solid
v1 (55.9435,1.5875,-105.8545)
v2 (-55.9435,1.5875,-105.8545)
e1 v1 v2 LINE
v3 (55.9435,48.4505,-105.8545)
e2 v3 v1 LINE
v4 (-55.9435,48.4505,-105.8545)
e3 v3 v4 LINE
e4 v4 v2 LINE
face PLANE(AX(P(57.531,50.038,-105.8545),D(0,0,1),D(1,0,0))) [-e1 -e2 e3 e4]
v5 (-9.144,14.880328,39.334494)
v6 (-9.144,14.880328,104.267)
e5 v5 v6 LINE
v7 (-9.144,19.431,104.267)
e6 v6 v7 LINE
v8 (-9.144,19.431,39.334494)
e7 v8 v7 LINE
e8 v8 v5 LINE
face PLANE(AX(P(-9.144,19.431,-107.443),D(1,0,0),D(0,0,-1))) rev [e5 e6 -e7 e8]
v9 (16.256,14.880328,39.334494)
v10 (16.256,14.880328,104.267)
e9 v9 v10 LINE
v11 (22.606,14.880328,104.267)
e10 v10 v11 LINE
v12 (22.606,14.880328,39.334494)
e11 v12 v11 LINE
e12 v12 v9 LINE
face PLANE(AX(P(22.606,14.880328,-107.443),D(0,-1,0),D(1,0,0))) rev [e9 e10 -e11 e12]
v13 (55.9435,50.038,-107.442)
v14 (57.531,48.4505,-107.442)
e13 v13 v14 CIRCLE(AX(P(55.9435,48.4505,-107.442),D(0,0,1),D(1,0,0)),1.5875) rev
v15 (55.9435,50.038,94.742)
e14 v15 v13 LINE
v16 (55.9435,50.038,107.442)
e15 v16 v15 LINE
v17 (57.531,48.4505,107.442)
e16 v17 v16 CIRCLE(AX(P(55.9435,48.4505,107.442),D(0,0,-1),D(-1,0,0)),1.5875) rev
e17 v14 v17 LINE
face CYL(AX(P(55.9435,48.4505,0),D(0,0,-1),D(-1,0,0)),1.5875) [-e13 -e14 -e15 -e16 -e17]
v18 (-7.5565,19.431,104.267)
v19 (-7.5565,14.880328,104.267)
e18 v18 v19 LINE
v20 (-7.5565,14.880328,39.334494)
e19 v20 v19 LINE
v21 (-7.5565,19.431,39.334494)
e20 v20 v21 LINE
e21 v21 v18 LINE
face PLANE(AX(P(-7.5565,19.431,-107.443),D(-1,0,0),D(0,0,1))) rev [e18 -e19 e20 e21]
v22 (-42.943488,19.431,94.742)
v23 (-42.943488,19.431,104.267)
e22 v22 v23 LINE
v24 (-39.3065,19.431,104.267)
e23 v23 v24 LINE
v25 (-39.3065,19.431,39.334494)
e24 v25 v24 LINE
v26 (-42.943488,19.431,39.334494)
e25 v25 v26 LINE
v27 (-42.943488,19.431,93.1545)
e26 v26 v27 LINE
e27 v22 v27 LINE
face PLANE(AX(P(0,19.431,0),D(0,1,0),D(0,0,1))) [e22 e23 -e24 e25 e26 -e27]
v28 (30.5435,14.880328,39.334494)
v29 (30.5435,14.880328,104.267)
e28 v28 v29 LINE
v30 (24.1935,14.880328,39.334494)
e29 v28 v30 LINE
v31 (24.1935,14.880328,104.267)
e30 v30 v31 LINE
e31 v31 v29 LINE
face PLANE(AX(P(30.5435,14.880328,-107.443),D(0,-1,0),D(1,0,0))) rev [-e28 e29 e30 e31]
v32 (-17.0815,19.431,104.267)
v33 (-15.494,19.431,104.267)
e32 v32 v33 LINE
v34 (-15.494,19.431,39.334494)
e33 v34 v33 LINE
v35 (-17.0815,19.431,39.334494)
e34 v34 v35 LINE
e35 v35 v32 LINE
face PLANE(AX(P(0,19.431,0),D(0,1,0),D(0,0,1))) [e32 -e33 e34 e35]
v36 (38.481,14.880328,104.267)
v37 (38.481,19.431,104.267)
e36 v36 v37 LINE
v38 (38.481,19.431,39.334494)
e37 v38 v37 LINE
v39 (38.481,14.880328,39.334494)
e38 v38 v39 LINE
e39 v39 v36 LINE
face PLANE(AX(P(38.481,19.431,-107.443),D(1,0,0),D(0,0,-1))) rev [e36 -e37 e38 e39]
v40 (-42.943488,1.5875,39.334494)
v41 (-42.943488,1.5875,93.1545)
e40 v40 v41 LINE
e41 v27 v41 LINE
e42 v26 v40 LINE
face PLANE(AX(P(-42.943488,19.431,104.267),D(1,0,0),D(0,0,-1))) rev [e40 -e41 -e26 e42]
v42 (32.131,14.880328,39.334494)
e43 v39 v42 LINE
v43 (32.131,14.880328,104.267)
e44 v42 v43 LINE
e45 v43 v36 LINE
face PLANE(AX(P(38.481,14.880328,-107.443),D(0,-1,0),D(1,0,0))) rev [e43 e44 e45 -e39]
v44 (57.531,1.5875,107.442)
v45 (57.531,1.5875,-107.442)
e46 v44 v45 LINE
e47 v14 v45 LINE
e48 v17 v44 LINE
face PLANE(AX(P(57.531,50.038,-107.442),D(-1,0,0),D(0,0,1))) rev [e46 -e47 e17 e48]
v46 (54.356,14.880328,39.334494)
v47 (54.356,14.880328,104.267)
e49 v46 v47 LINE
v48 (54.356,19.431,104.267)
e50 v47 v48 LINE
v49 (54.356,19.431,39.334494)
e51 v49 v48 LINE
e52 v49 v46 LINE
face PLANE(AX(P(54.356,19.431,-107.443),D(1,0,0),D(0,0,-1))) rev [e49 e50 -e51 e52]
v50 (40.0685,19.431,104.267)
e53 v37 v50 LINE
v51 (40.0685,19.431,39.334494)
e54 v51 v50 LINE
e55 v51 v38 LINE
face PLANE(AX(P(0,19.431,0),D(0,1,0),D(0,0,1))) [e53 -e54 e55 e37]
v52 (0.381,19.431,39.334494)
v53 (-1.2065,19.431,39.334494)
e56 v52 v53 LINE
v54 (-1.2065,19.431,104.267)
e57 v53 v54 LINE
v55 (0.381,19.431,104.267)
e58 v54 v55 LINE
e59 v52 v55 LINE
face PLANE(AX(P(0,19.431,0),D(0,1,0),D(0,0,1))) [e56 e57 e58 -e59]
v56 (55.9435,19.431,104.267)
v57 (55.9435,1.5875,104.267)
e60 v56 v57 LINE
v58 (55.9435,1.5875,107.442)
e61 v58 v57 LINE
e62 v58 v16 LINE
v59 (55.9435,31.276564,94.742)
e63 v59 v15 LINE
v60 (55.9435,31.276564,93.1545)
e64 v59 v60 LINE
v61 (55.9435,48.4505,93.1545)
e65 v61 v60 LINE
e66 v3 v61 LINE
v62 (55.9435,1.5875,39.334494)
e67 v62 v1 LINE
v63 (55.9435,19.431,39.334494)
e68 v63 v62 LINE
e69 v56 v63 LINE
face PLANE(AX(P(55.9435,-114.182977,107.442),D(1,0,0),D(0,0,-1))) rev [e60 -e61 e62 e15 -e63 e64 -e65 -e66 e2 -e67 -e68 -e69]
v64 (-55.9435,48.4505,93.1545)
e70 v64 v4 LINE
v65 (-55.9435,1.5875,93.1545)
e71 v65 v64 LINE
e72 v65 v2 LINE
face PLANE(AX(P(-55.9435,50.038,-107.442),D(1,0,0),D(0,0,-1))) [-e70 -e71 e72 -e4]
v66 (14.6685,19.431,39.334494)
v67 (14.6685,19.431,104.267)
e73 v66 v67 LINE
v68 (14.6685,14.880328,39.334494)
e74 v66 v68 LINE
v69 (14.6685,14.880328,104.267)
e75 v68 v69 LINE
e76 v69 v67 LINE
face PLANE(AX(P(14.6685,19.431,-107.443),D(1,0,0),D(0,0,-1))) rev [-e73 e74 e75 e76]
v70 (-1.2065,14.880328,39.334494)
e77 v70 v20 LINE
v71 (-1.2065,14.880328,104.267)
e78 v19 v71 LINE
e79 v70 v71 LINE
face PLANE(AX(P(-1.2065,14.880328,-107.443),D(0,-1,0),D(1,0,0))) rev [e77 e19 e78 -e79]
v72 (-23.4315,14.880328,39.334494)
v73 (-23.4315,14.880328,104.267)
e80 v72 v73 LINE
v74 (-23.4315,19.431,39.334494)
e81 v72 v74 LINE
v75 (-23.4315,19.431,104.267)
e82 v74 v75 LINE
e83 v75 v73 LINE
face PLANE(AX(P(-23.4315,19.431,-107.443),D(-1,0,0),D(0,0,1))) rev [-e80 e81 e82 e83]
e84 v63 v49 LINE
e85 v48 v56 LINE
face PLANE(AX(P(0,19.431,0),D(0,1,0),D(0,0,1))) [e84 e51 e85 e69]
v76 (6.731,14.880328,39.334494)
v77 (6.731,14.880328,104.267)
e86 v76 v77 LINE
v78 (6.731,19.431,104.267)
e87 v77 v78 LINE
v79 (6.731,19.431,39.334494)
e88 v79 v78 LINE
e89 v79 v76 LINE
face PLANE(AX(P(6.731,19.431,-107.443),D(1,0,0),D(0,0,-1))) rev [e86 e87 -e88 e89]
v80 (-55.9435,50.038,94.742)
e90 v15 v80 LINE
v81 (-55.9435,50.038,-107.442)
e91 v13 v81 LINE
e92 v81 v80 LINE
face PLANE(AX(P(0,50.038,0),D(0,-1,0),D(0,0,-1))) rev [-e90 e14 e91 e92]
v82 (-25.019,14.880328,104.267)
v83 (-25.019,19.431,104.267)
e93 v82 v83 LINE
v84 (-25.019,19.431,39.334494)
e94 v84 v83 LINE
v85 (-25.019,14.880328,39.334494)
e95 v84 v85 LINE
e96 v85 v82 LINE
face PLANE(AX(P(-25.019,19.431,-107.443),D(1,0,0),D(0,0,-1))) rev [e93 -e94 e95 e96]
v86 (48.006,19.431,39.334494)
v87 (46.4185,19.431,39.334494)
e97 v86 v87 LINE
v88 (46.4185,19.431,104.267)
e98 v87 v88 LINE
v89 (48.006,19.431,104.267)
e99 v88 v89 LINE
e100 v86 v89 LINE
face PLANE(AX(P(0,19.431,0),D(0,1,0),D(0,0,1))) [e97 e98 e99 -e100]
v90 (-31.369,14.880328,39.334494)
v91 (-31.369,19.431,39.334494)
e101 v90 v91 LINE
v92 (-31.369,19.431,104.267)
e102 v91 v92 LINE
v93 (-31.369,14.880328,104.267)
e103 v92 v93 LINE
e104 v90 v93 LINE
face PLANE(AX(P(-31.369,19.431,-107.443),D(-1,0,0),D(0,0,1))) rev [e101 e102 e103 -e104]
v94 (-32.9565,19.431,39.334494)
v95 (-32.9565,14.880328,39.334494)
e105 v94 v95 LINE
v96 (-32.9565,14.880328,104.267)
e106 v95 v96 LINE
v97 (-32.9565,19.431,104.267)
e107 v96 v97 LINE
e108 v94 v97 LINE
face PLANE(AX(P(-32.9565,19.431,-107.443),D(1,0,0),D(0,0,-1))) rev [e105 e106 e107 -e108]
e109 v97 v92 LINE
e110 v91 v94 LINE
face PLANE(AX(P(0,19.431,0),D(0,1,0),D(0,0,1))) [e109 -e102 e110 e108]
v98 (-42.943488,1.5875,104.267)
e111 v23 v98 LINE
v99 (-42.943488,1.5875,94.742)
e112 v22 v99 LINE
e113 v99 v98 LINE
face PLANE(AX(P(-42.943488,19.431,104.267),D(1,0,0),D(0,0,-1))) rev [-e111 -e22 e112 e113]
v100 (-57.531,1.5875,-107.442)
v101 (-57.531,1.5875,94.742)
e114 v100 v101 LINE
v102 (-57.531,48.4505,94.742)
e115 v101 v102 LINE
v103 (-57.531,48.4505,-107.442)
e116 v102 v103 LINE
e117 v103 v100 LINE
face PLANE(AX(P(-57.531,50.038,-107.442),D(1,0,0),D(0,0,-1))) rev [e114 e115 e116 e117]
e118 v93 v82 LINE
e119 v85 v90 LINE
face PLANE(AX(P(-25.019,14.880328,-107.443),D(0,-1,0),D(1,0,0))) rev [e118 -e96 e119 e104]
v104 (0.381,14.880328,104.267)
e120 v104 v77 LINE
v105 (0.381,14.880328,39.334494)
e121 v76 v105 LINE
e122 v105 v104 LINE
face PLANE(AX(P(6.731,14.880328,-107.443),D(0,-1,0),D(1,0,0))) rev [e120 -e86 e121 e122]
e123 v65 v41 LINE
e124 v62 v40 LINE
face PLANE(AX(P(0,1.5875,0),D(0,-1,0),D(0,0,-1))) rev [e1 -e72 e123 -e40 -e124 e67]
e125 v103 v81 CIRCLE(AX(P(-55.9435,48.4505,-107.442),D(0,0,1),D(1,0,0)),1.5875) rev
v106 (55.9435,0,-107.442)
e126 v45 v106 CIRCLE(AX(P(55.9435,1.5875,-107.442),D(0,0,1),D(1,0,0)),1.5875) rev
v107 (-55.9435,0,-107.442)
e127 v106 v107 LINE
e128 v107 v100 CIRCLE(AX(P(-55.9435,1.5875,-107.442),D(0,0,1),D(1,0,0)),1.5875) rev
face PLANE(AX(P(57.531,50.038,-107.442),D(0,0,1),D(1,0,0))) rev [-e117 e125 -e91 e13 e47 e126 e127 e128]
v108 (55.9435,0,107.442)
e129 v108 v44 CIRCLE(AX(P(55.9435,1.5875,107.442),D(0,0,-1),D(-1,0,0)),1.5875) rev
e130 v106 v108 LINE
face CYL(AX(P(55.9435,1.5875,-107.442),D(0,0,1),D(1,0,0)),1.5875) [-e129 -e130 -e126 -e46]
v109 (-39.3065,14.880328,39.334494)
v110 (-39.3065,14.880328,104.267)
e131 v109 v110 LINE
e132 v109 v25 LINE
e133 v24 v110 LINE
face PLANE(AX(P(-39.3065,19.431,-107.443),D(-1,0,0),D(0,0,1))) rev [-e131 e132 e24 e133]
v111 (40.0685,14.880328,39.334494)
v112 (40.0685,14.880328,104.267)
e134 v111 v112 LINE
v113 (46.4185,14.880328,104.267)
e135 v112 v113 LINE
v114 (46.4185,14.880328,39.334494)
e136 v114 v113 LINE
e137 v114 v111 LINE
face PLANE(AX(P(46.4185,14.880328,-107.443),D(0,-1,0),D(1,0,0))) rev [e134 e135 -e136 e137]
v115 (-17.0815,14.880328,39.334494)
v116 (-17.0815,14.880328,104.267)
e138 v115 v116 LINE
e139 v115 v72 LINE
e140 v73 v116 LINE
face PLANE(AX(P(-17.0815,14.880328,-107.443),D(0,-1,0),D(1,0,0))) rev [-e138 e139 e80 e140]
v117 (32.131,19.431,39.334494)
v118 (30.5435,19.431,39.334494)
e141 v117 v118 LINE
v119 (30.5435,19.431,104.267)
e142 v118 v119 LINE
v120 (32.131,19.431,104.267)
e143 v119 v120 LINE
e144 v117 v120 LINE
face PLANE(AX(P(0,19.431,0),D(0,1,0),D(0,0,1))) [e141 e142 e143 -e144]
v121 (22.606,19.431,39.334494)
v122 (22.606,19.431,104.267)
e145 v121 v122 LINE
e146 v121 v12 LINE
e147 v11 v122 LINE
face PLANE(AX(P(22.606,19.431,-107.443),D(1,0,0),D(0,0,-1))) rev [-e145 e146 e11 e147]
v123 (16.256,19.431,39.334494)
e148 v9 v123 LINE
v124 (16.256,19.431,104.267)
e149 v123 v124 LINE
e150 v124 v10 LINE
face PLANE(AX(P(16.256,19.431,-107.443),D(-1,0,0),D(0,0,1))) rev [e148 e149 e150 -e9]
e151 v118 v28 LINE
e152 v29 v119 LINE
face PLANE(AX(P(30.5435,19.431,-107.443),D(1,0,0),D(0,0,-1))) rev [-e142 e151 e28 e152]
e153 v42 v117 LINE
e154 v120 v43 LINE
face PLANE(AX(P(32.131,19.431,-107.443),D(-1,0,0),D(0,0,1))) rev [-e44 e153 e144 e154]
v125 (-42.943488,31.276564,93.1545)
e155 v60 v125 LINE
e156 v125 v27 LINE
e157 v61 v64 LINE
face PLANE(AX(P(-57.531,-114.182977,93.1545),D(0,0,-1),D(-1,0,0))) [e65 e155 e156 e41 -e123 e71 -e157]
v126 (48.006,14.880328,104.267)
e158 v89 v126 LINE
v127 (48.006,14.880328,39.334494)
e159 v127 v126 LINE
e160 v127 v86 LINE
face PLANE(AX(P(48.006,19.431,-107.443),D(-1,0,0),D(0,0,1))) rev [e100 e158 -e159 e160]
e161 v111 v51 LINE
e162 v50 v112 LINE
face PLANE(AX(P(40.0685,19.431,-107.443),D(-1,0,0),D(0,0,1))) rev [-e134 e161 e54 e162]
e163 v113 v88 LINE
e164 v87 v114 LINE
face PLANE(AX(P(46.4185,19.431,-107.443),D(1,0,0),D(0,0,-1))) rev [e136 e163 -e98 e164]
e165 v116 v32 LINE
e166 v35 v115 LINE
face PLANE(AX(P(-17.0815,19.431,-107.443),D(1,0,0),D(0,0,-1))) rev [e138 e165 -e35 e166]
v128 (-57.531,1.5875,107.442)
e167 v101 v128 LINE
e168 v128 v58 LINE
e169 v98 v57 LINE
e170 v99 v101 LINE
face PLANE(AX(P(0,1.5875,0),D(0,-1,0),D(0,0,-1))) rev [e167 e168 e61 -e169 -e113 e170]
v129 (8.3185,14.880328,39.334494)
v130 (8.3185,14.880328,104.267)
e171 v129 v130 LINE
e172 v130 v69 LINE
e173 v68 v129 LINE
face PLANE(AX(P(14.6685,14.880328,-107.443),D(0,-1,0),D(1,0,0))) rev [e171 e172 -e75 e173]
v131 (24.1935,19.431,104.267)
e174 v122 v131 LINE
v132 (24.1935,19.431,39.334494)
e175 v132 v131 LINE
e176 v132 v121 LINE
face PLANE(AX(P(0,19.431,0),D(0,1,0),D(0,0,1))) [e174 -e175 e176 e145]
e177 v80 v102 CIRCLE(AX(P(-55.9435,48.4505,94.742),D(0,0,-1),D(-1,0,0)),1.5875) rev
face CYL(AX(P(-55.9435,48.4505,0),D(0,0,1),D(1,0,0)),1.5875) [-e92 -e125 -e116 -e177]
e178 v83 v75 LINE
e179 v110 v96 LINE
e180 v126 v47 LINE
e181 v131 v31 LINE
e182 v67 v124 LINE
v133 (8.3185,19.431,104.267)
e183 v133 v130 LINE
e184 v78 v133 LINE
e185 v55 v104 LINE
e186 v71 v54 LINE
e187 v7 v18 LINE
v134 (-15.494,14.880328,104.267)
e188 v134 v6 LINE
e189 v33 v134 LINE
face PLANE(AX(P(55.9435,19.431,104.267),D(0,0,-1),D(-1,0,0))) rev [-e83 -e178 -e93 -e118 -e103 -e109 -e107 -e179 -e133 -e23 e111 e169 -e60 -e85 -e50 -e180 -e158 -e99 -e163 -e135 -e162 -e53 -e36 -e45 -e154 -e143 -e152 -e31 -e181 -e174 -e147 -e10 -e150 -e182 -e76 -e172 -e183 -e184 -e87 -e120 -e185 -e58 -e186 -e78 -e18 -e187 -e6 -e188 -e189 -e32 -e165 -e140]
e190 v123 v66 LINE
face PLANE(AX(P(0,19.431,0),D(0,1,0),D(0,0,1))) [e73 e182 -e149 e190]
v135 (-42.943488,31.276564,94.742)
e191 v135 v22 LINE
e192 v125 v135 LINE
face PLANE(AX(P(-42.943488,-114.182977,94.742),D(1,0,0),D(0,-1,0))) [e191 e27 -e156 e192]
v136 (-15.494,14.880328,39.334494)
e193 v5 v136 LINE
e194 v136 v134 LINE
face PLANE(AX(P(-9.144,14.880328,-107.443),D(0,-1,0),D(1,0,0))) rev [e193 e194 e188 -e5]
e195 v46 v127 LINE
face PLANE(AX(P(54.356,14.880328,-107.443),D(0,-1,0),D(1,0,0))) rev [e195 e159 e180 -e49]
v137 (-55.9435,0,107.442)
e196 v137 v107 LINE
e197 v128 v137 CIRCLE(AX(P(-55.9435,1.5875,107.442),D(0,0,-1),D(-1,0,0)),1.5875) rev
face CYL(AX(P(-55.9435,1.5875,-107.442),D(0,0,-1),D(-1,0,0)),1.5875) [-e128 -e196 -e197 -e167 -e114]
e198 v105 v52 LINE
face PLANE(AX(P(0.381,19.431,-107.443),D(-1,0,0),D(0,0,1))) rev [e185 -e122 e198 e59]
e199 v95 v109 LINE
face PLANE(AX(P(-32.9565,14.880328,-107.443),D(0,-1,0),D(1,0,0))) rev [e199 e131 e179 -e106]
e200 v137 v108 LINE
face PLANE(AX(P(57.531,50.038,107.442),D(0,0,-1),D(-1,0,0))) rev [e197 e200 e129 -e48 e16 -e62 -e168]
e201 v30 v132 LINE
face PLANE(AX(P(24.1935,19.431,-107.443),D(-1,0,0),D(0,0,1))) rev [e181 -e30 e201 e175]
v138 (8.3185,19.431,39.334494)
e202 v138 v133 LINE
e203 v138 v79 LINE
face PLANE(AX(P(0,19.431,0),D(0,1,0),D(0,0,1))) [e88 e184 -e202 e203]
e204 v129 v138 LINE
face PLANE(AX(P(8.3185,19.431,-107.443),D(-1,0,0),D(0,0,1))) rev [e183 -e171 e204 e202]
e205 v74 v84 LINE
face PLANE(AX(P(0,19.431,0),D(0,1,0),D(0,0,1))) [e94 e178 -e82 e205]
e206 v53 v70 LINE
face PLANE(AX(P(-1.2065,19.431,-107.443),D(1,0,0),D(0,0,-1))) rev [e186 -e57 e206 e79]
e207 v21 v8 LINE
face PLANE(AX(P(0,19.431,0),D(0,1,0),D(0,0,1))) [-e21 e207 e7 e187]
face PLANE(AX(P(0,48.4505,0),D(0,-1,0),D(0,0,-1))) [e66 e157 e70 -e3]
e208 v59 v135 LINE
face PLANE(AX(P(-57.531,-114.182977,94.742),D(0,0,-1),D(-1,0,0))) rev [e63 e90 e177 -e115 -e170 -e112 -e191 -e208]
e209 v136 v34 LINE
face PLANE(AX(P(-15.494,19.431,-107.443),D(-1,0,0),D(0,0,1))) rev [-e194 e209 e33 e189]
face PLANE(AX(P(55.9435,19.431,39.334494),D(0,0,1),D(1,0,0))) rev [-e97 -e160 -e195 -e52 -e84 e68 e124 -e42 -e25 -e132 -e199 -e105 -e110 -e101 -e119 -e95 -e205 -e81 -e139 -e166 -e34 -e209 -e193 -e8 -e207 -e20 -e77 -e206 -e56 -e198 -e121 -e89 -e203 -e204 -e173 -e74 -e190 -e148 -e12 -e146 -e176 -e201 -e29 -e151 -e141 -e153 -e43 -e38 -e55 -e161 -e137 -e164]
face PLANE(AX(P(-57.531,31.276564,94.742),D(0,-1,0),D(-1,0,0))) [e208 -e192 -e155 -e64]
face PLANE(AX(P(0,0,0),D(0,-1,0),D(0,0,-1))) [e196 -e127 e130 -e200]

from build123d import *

# Parameters (mm, degrees)
SKETCH1_W           = 115.062
SKETCH1_H           = 214.884
BOSS_EXTRUDE1_DEPTH = 50.038
SKETCH2_W           = 113.4745
SKETCH2_H           = 12.7
CUT_EXTRUDE1_DEPTH  = 48.4505
FILLET2_R           = 1.5875
SHELL2_START        = 1.5875
SHELL2_OUTLINE_W    = 111.887
SHELL2_OUTLINE_H    = 199.009
SHELL2_DEPTH        = 46.863
SHELL2_2_OUTLINE_W  = 98.886987896
SHELL2_2_OUTLINE_H  = 1.5875
SHELL2_2_DEPTH      = 29.689064402
SKETCH3_W           = 98.886987896
SKETCH3_H           = 64.932506417
BOSS_EXTRUDE2_DEPTH = 17.8435
CUT_EXTRUDE2_REACH  = 227.021
SKETCH5_W           = 6.35
SKETCH5_H           = 4.550671723
LPATTERN1_COUNT     = 12
LPATTERN1_PITCH     = 7.9375


# Read off the part's stored shape, not the designer's step: Shell2
with BuildPart() as part:
    # Sketch1 → Boss-Extrude1 (new body)
    with BuildSketch(Plane(origin=(0, 0, 0), x_dir=(1, 0, 0), z_dir=(0, 1, 0))):
        Rectangle(SKETCH1_W, SKETCH1_H)
    extrude(amount=BOSS_EXTRUDE1_DEPTH)

    # Sketch2 → Cut-Extrude1 (cut)
    with BuildSketch(Plane(origin=(0, 50.038, 0), x_dir=(1, 0, 0), z_dir=(0, 1, 0))):
        with Locations((-0.79375, -101.092)):
            Rectangle(SKETCH2_W, SKETCH2_H)
    extrude(amount=-CUT_EXTRUDE1_DEPTH, mode=Mode.SUBTRACT)

    # Fillet2
    fillet2_edges = [part.edges().sort_by_distance(p)[0] for p in [
        (-57.531, 0, 0),
        (-57.531, 50.038, -6.35),
        (57.531, 0, 0),
        (57.531, 50.038, 0),
    ]]
    fillet(fillet2_edges, radius=FILLET2_R)

    # Shell2 outline → Shell2 (cut)
    with BuildSketch(Plane(origin=(0, 0, 0), x_dir=(1, 0, 0), z_dir=(0, 1, 0)).offset(SHELL2_START)):
        with Locations((0, 6.35)):
            Rectangle(SHELL2_OUTLINE_W, SHELL2_OUTLINE_H)
    extrude(amount=SHELL2_DEPTH, mode=Mode.SUBTRACT)

    # Shell2 2 outline → Shell2 2 (cut)
    with BuildSketch(Plane(origin=(0, 0, 0), x_dir=(1, 0, 0), z_dir=(0, 1, 0)).offset(SHELL2_START)):
        with Locations((6.500006052, -93.94825)):
            Rectangle(SHELL2_2_OUTLINE_W, SHELL2_2_OUTLINE_H)
    extrude(amount=SHELL2_2_DEPTH, mode=Mode.SUBTRACT)

    # Sketch3 → Boss-Extrude2 (add)
    with BuildSketch(Plane(origin=(0, 1.5875, 0), x_dir=(1, 0, 0), z_dir=(0, 1, 0))):
        with Locations((6.500006052, -71.800746792)):
            Rectangle(SKETCH3_W, SKETCH3_H)
    extrude(amount=BOSS_EXTRUDE2_DEPTH)

    # Sketch5 → Cut-Extrude2 (cut, up to next)
    with BuildSketch(Plane.XY.offset(104.267), mode=Mode.PRIVATE) as cut_extrude2_sk1:
        with Locations((51.181, 17.155664139)):
            Rectangle(SKETCH5_W, SKETCH5_H)
    cut_extrude2_tool1 = extrude(cut_extrude2_sk1.sketch, amount=-CUT_EXTRUDE2_REACH, mode=Mode.PRIVATE) & part.part
    cut_extrude2 = cut_extrude2_tool1.solids().sort_by_distance((51.181, 17.155664, 104.267))[0]
    add(cut_extrude2, mode=Mode.SUBTRACT)

    # LPattern1: Cut-Extrude2 ×12
    with Locations(*[(-i * LPATTERN1_PITCH, 0, 0) for i in range(1, LPATTERN1_COUNT)]):
        add(cut_extrude2, mode=Mode.SUBTRACT)


solid = part.part
